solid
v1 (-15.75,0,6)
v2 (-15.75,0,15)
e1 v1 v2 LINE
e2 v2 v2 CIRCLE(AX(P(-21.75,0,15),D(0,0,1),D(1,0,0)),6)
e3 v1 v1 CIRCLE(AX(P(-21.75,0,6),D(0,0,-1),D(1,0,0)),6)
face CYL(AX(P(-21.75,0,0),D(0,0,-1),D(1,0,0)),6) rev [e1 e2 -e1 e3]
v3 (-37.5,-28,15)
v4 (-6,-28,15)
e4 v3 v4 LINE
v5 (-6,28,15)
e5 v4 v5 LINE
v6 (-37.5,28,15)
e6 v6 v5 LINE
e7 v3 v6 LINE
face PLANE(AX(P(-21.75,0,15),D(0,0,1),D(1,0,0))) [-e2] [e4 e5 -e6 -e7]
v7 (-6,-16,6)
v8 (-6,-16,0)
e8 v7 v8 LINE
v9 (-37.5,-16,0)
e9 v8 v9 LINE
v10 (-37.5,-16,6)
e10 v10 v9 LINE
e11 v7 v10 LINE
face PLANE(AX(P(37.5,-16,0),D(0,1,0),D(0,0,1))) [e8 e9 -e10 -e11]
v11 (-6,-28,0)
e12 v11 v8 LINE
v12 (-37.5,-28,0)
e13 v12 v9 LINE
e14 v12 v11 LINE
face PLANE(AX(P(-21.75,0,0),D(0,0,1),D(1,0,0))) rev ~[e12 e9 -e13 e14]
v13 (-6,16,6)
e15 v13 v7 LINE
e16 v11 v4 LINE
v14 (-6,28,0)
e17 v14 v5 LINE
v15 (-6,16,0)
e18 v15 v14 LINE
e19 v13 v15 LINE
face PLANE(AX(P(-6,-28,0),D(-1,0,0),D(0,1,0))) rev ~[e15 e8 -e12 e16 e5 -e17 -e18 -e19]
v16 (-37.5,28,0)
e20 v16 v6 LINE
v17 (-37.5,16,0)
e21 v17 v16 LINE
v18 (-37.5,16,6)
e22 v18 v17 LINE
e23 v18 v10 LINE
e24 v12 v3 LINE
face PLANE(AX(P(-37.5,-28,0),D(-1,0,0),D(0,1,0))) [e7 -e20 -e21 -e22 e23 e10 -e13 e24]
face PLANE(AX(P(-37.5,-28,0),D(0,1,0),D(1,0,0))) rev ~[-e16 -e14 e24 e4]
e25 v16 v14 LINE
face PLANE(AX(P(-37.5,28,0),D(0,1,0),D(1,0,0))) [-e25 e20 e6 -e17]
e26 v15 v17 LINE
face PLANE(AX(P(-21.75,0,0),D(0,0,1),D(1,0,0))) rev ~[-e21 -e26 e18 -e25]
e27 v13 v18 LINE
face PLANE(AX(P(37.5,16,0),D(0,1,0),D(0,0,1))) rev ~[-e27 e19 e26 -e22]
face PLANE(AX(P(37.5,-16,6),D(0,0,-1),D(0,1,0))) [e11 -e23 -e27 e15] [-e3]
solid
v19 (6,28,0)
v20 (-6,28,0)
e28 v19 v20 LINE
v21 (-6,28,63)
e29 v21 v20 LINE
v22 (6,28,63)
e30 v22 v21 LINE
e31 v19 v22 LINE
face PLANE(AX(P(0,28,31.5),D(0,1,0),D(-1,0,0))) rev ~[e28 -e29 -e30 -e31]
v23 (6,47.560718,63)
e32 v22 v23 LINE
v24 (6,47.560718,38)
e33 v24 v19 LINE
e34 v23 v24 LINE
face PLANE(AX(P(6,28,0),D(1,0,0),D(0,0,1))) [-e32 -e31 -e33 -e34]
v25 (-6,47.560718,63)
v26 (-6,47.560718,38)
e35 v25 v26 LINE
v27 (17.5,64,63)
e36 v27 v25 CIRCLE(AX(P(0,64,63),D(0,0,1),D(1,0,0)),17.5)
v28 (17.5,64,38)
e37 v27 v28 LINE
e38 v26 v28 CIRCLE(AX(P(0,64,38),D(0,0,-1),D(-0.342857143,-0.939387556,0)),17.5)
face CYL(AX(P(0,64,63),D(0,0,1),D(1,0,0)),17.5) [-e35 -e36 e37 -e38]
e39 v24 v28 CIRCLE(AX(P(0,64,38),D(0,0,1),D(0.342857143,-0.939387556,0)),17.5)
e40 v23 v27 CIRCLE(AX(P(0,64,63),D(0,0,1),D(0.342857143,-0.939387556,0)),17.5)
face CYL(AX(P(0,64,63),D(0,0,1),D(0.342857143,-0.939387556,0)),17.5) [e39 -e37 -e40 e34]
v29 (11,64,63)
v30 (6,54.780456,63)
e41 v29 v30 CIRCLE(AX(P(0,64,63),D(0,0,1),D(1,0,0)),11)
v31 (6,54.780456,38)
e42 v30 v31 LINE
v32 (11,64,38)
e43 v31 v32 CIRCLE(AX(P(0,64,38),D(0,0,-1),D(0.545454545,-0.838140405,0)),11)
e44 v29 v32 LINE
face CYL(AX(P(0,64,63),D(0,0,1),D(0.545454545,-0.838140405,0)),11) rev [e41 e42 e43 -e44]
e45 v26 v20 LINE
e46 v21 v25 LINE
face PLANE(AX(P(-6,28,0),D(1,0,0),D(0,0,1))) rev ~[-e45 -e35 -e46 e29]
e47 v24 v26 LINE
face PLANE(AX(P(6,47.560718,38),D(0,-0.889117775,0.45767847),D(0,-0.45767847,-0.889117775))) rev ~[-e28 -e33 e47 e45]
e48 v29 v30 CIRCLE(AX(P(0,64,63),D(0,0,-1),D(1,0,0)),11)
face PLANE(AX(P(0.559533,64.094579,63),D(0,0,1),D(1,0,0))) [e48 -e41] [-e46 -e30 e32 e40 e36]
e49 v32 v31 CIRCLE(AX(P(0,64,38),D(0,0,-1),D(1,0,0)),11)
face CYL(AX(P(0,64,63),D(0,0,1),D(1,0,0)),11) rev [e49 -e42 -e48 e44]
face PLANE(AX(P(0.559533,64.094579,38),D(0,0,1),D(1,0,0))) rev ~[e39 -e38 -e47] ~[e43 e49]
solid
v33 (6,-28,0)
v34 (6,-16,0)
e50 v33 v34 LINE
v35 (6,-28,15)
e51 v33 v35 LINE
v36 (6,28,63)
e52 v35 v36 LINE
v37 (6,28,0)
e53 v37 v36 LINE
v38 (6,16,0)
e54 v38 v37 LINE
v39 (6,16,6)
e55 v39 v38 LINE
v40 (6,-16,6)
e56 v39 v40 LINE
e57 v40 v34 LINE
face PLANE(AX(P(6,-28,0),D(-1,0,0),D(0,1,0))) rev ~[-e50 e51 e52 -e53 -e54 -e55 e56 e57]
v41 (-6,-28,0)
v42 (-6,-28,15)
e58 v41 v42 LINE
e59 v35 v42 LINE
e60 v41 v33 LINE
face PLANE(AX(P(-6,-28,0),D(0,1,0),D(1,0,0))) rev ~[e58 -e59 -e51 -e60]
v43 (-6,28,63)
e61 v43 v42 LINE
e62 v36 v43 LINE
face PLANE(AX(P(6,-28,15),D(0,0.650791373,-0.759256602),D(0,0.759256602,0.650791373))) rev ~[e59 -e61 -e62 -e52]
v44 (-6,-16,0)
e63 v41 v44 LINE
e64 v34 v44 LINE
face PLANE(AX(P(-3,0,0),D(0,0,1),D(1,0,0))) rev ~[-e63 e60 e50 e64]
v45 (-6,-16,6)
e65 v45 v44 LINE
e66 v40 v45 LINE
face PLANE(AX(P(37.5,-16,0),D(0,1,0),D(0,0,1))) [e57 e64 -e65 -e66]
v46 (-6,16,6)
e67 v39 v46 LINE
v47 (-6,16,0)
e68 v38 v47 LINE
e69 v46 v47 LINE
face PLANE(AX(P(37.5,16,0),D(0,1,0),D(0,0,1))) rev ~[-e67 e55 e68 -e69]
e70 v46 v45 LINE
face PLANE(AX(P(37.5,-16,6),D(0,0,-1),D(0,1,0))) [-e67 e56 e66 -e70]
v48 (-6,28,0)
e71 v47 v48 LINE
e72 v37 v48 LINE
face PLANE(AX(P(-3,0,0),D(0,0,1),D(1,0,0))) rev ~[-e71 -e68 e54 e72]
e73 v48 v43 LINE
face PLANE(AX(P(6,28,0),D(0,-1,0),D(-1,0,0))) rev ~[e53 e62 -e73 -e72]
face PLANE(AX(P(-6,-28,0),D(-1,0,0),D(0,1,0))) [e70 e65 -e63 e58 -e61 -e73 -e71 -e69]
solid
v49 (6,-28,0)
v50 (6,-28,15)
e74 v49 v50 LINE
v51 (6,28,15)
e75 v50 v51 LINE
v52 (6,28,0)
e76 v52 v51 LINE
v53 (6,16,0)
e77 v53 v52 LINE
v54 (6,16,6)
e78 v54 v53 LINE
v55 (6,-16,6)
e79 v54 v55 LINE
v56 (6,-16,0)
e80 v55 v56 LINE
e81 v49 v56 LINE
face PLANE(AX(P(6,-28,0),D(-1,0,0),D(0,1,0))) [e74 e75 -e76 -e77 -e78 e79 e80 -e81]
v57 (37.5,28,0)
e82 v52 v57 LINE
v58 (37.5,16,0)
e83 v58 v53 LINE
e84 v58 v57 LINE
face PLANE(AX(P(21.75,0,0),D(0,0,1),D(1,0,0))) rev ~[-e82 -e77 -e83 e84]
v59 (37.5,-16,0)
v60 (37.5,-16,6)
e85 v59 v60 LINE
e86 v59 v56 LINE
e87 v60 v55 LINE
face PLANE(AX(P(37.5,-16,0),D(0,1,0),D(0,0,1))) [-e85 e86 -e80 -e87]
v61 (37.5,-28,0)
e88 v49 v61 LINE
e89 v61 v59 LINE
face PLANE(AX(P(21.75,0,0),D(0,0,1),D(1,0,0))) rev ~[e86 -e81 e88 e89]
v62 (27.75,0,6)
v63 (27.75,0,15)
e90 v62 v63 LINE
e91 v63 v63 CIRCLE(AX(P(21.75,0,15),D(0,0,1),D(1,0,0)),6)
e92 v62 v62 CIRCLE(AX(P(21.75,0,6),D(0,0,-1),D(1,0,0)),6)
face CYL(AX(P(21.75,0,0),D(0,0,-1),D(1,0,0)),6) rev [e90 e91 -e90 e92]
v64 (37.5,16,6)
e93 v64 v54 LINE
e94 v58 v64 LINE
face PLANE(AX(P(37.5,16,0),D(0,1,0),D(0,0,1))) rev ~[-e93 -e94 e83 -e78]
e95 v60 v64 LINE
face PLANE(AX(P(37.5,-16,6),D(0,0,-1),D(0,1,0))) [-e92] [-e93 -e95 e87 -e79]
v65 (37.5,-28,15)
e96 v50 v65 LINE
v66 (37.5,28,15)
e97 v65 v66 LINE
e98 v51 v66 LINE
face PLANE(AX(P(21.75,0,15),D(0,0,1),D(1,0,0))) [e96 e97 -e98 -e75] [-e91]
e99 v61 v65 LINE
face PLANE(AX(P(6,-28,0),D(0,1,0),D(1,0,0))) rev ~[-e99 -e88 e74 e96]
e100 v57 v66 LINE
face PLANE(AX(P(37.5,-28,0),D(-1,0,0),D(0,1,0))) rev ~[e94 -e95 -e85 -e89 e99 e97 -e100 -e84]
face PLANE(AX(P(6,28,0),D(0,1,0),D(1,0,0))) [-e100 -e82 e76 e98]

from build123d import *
from build123d import SkipClean  # not in build123d's __all__

# Parameters (mm, degrees)
F0_W      = 31.5
F0_H      = 56
F0_R      = 6
F1_DEPTH  = 15
F0_W_2    = 6
F2_DEPTH  = 63
F4_DEPTH  = 25
F5_W      = 12
F5_H      = 63
F6_DEPTH  = 36
F8_DEPTH  = 134.4
F9_DEPTH  = 25
F11_DEPTH = 25
F12_W     = 32
F12_H     = 6
F13_DEPTH = 101.3


# Not quite as in the source:
# - after a boolean that leaves OpenCascade's solid faulty, fix() repairs it


with BuildPart() as f1:
    # F0 (on Top) → F1 (new body)
    with BuildSketch(Plane.XY):
        with Locations((-21.75, 0)):
            Rectangle(F0_W, F0_H)
        with Locations((-21.75, 0)):
            Circle(F0_R, mode=Mode.SUBTRACT)
    extrude(amount=F1_DEPTH)


with BuildPart() as f1b:
    # F0 (on Top) → F1, piece 2 (new body)
    with BuildSketch(Plane.XY):
        with Locations((21.75, 0)):
            Rectangle(F0_W, F0_H)
        with Locations((21.75, 0)):
            Circle(F0_R, mode=Mode.SUBTRACT)
    extrude(amount=F1_DEPTH)


with BuildPart() as f2:
    # F0 (on Top) → F2 (new body)
    with BuildSketch(Plane.XY):
        with Locations((-3, 0)):
            Rectangle(F0_W_2, F0_H)
        with Locations((3, 0)):
            Rectangle(F0_W_2, F0_H)
    extrude(amount=F2_DEPTH)

    # F3 (on face) → F4 (cut)
    with BuildSketch(Plane.YZ.offset(6)):
        Polygon((-28, 63), (-28, 15), (28, 63), align=None)
    extrude(amount=-F4_DEPTH, mode=Mode.SUBTRACT)


with BuildPart() as f6:
    # F5 (on face) → F6 (new body)
    with BuildSketch(Plane(origin=(0, 28, 0), x_dir=(-1, 0, 0), z_dir=(0, 1, 0))):
        with Locations((0, 31.5)):
            Rectangle(F5_W, F5_H)
    extrude(amount=F6_DEPTH)

    # F7 (on face) → F8 (cut)
    with BuildSketch(Plane.XY.offset(63)):
        with BuildLine():
            Line((-6, 64), (-6, 54.7804555427))
            ThreePointArc((-6, 54.7804555427), (0, 53), (6, 54.7804555427))
            Line((6, 54.7804555427), (6, 64))
            Line((6, 64), (-6, 64))
        make_face()
    extrude(amount=-F8_DEPTH, mode=Mode.SUBTRACT)

    # F7 (on face) → F9 (join)
    with BuildSketch(Plane.XY.offset(63)):
        with BuildLine():
            ThreePointArc((-6, 54.7804555427), (-5.2440442409, 73.6695398029), (11, 64))
            ThreePointArc((11, 64), (9.6695398029, 58.7559557591), (6, 54.7804555427))
            Line((6, 54.7804555427), (6, 47.5607177772))
            ThreePointArc((6, 47.5607177772), (14.3396303997, 53.9687986761), (17.5, 64))
            ThreePointArc((17.5, 64), (-10.0312013239, 78.3396303997), (-6, 47.5607177772))
            Line((-6, 47.5607177772), (-6, 54.7804555427))
        make_face()
        with BuildLine():
            ThreePointArc((6, 54.7804555427), (0, 53), (-6, 54.7804555427))
            Line((-6, 54.7804555427), (-6, 47.5607177772))
            ThreePointArc((-6, 47.5607177772), (0, 46.5), (6, 47.5607177772))
            Line((6, 47.5607177772), (6, 54.7804555427))
        make_face()
        with BuildLine():
            ThreePointArc((6, 47.5607177772), (0, 46.5), (-6, 47.5607177772))
            Line((-6, 47.5607177772), (-6, 28))
            Line((-6, 28), (6, 28))
            Line((6, 28), (6, 47.5607177772))
        make_face()
    with SkipClean():  # cleaning this boolean's faces spoils the solid; the shape is the same uncleaned
        extrude(amount=-F9_DEPTH)

    # F10 (on face) → F11 (cut)
    with BuildSketch(Plane.YZ.offset(6)):
        Polygon((28, 0), (54.7804555427, 0), (54.7804555427, 38), (47.5607177772, 38), align=None)
    extrude(amount=-F11_DEPTH, mode=Mode.SUBTRACT)

    add(f6.part.fix(), mode=Mode.REPLACE)


with BuildPart() as f13_tool:
    # F12 (on face) → F13 (new body)
    with BuildSketch(Plane.YZ.offset(37.5)):
        with Locations((0, 3)):
            Rectangle(F12_W, F12_H)
    extrude(amount=-F13_DEPTH)


with BuildPart() as f1_1:
    add(f1.part, clean=False)

    # F13: cut by f13_tool
    add(f13_tool.part, mode=Mode.SUBTRACT)


with BuildPart() as f1b_1:
    add(f1b.part, clean=False)

    # F13: cut by f13_tool
    add(f13_tool.part, mode=Mode.SUBTRACT)


with BuildPart() as f2_1:
    add(f2.part, clean=False)

    # F13: cut by f13_tool
    add(f13_tool.part, mode=Mode.SUBTRACT)


solid = Compound([f6.part, f1_1.part, f1b_1.part, f2_1.part])
